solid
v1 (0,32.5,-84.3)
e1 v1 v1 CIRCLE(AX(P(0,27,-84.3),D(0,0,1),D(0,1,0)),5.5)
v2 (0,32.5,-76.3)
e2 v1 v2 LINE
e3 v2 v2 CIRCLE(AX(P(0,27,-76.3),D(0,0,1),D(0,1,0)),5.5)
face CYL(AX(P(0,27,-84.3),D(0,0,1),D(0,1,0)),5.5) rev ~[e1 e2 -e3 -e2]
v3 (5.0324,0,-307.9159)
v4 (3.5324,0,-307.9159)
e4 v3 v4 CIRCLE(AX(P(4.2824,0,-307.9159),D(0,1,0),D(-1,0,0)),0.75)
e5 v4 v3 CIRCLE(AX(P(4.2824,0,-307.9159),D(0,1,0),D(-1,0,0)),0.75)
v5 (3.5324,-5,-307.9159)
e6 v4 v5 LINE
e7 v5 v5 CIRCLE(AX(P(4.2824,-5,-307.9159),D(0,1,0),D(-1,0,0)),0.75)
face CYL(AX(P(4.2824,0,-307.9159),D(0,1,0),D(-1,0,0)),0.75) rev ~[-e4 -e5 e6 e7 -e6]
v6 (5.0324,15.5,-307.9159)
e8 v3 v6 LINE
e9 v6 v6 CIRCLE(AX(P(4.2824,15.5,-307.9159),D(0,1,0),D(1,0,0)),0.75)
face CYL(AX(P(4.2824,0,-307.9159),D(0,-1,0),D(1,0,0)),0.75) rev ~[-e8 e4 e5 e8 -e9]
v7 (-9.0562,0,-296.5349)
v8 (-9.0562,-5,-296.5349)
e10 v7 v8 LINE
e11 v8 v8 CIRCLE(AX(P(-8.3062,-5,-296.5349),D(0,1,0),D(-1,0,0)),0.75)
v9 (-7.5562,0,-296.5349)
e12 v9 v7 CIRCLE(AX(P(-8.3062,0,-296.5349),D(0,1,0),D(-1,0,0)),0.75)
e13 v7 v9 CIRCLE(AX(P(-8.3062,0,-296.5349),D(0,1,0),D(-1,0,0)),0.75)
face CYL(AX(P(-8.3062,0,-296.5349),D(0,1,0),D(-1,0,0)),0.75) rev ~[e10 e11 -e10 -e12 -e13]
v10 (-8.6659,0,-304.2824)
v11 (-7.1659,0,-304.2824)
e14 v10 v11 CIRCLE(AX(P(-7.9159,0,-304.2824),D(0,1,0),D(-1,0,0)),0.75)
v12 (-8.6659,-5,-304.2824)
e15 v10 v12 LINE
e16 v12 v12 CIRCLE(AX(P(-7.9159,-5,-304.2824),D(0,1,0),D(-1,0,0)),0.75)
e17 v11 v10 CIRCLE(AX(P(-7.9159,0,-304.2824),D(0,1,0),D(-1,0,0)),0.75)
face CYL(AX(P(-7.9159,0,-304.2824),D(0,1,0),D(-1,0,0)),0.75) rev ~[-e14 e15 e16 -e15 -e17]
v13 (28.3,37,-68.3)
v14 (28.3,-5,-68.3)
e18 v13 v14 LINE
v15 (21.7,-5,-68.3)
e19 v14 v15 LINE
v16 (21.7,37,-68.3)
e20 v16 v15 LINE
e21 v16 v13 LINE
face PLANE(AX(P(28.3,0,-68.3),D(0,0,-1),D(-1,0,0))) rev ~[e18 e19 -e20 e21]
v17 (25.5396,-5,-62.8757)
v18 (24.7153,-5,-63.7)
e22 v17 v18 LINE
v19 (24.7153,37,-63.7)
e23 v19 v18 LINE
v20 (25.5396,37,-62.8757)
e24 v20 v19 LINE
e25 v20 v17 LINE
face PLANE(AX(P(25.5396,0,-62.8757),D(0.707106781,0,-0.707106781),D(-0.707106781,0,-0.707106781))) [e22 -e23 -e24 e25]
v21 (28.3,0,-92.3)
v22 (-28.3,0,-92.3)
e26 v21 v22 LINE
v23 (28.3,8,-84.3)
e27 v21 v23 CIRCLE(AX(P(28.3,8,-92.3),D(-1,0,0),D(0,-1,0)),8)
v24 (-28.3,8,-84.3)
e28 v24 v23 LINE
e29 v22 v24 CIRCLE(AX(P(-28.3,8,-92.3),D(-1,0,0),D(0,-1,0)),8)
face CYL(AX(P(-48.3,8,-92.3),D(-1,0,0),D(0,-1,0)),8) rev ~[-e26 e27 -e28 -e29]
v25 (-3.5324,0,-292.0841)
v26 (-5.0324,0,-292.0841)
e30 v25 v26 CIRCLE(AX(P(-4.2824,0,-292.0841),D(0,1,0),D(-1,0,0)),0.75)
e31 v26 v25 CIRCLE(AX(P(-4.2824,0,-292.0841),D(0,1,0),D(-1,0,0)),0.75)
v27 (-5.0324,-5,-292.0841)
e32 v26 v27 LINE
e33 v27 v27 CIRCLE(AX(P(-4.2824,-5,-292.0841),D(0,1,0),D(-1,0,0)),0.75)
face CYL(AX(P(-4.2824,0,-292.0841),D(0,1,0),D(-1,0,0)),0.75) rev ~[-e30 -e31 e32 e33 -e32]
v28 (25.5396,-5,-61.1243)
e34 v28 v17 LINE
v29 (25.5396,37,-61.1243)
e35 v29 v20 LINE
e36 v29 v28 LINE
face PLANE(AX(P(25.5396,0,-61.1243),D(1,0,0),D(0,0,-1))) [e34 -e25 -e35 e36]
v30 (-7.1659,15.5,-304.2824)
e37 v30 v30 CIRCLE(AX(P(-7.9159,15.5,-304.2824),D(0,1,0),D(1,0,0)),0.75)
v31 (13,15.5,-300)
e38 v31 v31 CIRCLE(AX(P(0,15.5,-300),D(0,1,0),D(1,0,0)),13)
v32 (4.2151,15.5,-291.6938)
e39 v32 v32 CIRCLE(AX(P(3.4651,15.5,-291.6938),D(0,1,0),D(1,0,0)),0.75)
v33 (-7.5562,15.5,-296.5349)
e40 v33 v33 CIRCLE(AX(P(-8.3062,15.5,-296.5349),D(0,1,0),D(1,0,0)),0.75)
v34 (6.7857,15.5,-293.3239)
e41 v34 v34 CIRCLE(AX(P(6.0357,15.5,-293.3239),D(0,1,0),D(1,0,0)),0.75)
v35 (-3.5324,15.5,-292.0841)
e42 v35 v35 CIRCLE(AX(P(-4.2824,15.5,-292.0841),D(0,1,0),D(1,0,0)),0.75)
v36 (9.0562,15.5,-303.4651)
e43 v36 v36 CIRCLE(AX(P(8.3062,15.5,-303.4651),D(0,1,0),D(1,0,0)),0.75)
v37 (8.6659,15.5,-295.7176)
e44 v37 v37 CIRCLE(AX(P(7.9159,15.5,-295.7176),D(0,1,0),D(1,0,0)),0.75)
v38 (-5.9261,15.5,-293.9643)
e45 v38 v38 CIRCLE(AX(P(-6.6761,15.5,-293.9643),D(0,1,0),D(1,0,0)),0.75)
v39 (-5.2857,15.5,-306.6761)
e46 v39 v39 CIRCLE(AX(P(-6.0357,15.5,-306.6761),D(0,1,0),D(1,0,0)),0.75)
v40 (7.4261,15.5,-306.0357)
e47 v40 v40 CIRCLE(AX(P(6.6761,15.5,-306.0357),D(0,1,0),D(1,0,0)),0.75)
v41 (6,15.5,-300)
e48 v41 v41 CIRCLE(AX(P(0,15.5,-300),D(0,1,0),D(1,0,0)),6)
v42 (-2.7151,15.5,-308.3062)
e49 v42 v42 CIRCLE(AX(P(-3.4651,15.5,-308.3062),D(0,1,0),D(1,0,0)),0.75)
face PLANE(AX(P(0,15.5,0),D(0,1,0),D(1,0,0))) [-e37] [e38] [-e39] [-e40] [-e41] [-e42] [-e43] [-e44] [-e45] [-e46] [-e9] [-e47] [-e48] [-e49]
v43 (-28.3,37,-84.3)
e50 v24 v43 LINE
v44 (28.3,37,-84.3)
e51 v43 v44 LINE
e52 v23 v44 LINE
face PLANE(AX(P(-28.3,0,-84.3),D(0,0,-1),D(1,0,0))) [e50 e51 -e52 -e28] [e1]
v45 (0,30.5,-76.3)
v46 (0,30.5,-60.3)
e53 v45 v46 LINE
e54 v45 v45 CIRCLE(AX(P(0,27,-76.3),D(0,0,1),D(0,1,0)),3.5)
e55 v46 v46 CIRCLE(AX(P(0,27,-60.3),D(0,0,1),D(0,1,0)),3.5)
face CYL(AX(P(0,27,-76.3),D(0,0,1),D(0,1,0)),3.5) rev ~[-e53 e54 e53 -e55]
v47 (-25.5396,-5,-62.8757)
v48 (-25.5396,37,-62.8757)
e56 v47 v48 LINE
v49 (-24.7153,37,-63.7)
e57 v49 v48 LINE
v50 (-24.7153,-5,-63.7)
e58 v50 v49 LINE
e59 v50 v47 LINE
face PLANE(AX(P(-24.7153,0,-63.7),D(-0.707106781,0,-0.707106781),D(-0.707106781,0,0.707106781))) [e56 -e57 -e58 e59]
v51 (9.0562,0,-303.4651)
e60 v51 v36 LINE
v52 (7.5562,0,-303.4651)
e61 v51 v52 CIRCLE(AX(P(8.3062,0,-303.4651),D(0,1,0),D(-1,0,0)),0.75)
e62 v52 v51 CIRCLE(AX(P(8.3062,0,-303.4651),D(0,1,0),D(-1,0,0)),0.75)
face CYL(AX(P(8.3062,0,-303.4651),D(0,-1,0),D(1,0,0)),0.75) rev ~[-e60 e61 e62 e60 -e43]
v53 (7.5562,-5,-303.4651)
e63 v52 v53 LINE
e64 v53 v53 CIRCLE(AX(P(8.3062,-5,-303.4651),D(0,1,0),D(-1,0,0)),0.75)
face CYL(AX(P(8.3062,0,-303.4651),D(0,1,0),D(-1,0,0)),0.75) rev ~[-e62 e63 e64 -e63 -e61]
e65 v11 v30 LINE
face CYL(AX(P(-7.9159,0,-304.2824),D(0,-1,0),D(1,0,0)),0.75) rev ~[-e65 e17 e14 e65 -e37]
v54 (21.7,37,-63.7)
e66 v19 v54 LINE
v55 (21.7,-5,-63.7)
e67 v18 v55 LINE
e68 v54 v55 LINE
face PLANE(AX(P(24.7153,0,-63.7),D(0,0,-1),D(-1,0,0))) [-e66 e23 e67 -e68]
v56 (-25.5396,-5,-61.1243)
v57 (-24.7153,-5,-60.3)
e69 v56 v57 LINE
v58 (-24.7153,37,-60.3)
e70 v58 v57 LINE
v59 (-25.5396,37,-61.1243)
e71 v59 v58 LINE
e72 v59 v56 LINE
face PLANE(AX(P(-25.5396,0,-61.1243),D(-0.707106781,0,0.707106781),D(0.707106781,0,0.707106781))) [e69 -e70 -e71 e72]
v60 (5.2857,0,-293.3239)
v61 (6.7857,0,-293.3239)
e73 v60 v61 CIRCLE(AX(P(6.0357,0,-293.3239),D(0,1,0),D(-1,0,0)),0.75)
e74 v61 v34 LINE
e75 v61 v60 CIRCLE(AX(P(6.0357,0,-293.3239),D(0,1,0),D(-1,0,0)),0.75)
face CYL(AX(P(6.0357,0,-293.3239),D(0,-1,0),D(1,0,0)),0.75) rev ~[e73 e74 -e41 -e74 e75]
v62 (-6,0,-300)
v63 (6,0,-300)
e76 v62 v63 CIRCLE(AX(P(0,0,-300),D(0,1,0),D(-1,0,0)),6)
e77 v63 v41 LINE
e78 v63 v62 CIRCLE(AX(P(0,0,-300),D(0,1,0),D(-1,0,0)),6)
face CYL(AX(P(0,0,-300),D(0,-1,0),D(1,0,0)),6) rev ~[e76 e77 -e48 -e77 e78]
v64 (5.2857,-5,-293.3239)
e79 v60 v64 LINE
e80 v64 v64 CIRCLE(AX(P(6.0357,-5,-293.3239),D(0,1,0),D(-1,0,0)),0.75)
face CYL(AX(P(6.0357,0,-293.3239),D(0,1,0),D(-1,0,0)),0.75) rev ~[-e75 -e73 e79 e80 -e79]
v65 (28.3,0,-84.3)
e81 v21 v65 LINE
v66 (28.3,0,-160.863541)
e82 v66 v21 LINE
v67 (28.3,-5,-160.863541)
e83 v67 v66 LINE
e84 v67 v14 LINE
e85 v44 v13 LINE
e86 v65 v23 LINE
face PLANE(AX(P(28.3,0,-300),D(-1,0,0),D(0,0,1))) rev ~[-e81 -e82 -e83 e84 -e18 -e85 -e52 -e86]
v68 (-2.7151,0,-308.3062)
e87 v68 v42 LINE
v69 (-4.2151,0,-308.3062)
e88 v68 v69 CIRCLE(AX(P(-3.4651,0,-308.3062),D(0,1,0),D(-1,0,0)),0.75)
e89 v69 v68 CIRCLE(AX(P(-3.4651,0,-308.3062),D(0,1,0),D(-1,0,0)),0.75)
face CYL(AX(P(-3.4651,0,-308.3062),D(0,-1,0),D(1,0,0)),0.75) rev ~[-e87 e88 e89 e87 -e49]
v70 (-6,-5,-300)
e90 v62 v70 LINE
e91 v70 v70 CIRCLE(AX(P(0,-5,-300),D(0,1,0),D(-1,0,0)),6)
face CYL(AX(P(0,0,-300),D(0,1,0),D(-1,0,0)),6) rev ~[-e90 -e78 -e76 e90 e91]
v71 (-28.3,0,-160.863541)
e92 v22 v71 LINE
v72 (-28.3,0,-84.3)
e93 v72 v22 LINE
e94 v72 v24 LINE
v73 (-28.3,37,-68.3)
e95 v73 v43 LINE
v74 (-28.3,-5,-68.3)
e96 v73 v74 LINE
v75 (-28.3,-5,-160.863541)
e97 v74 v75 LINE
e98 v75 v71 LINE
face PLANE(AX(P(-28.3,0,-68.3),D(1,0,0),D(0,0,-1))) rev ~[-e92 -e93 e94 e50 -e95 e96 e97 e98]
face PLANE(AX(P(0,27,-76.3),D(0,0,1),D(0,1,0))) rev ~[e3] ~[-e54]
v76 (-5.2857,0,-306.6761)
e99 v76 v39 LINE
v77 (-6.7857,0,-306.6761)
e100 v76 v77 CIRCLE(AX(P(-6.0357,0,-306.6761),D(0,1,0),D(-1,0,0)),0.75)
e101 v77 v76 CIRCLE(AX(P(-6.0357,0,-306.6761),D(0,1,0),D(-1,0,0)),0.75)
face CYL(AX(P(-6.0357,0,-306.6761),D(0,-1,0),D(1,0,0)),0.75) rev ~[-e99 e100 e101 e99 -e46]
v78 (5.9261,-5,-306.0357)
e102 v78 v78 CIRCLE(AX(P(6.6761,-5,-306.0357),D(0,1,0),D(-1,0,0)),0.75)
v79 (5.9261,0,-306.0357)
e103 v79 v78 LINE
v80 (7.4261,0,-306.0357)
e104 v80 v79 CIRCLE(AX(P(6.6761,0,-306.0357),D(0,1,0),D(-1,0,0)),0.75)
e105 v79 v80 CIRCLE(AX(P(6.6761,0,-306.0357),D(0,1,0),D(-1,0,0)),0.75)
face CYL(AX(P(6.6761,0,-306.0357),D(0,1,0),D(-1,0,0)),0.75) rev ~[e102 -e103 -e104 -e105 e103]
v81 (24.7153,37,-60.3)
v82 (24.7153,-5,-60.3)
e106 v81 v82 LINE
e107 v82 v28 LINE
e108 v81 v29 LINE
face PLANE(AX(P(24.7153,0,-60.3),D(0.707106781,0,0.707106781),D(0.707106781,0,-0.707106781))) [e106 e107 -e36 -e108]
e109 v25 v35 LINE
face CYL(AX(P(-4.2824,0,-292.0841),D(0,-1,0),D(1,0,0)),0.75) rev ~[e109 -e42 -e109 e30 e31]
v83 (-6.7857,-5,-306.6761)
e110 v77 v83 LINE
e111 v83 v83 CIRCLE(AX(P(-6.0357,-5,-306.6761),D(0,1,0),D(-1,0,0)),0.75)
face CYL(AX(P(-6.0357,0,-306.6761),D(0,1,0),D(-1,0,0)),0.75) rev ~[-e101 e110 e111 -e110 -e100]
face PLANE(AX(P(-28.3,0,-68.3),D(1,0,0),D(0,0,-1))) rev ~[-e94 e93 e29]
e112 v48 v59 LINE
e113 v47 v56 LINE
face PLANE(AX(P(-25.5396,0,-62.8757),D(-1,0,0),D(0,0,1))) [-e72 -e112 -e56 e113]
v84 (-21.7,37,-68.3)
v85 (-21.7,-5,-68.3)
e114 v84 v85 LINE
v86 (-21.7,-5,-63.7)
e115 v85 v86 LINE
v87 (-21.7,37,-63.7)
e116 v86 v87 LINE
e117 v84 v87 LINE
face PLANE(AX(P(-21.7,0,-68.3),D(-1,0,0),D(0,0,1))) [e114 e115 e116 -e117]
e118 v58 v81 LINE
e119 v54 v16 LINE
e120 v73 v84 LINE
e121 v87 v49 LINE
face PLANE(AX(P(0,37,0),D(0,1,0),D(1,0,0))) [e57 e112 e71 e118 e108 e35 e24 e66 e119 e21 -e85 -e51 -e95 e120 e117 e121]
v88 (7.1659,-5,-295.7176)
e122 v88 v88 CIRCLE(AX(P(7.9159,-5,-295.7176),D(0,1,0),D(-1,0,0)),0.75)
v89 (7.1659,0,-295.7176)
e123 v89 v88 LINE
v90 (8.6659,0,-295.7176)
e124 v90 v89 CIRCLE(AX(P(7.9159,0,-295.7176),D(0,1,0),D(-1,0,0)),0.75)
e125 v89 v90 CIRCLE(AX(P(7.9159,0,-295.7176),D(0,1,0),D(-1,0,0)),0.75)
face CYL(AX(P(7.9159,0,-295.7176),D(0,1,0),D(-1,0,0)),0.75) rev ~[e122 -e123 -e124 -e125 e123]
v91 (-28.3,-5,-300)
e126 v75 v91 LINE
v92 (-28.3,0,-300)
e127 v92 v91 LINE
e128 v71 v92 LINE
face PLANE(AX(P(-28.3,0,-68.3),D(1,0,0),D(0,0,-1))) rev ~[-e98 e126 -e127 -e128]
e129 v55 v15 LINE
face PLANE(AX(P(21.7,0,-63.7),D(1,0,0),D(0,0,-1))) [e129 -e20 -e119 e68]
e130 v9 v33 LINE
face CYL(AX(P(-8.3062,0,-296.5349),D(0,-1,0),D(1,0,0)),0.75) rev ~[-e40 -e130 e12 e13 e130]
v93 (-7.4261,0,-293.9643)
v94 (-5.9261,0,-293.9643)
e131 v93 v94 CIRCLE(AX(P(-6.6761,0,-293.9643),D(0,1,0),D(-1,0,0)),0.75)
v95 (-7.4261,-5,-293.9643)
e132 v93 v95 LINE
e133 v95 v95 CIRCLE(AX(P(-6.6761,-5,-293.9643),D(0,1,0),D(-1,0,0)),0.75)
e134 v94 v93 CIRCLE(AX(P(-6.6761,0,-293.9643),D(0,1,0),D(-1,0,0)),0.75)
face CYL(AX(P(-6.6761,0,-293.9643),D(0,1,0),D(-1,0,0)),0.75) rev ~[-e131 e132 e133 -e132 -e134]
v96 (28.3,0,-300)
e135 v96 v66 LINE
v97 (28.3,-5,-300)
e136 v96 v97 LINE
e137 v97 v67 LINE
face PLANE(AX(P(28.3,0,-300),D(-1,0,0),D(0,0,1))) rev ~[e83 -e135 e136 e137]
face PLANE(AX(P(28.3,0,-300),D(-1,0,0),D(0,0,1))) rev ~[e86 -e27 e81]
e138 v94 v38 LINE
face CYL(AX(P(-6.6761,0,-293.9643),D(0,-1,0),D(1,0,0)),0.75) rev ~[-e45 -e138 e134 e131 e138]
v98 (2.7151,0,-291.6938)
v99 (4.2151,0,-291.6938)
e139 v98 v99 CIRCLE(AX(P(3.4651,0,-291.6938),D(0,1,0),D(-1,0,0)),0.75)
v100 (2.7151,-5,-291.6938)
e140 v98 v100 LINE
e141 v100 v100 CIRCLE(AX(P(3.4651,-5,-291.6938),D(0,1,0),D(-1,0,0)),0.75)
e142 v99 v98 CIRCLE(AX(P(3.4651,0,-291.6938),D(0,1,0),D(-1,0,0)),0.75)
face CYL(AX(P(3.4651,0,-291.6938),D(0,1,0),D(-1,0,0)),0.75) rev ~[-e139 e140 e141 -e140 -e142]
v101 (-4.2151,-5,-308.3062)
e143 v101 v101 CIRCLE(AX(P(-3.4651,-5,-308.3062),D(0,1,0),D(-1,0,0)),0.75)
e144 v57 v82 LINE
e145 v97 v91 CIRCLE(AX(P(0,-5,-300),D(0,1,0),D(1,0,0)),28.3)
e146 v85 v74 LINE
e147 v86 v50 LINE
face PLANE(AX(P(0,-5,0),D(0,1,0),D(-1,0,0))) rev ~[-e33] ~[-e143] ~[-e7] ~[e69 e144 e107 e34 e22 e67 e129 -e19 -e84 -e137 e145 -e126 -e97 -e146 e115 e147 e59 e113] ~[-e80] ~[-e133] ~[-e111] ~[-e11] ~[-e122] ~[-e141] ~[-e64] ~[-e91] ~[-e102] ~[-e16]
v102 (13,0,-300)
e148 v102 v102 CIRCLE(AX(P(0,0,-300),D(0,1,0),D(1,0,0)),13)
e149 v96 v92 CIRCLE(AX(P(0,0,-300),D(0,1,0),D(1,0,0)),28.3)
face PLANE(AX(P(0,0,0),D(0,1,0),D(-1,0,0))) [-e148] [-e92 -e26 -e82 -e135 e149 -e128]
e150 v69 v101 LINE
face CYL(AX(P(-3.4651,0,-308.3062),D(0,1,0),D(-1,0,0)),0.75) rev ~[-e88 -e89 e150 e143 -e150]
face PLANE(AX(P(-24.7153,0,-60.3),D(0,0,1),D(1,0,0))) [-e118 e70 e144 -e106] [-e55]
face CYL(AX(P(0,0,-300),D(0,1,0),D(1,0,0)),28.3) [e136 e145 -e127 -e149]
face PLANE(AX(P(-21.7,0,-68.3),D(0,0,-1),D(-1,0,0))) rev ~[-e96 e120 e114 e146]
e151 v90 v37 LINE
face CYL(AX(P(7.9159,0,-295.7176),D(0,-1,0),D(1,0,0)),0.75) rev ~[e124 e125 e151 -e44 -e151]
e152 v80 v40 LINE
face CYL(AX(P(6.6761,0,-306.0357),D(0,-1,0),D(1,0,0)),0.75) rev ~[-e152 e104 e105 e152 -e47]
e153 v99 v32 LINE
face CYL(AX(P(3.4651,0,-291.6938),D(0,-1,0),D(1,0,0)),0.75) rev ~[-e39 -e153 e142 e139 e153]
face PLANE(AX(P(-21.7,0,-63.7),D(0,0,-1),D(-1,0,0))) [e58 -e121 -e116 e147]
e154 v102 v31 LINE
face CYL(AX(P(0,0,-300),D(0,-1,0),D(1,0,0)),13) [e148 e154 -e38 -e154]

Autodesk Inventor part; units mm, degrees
ref_plane "YZ Plane" through (0, 0, 0) normal (1, 0, 0) x (0, 1, 0)
ref_plane "XZ Plane" through (0, 0, 0) normal (0, 1, 0) x (-1, 0, 0)
ref_plane "XY Plane" through (0, 0, 0) normal (0, 0, 1) x (1, 0, 0)
sketch "Sketch1" plane through (0, 0, 0) normal (0, 1, 0) x (-1, 0, 0)
  circle A0 centre (14, -52) radius 5.5 construction
  circle A1 centre (-14, -52) radius 5.5 construction
  circle A2 centre (-4.2824, 7.9159) radius 0.75 construction
  circle A3 centre (3.4651, 8.3062) radius 0.75 construction
  circle A4 centre (6.0357, 6.6761) radius 0.75 construction
  circle A5 centre (7.9159, 4.2824) radius 0.75 construction
  circle A6 centre (8.3062, -3.4651) radius 0.75 construction
  circle A7 centre (6.6761, -6.0357) radius 0.75 construction
  circle A8 centre (4.2824, -7.9159) radius 0.75 construction
  circle A9 centre (-3.4651, -8.3062) radius 0.75 construction
  circle A10 centre (-6.0357, -6.6761) radius 0.75 construction
  circle A11 centre (-7.9159, -4.2824) radius 0.75 construction
  circle A12 centre (-6.6761, 6.0357) radius 0.75 construction
  circle A13 centre (-8.3062, 3.4651) radius 0.75 construction
  circle A14 centre (0, 0) radius 6 construction
  line L0 (28, -68) -> (28, 0) construction
  arc A15 (28, 0) -> (-28, 0) centre (0, 0) ccw construction
  line L1 (-28, 0) -> (-28, -68) construction
  line L2 (-28, -68) -> (-22, -68) construction
  line L3 (-22, -68) -> (-22, -64) construction
  line L4 (-22, -64) -> (-24.8396, -64) construction
  line L5 (-24.8396, -64) -> (-25.8396, -63) construction
  line L6 (-25.8396, -63) -> (-25.8396, -61) construction
  line L7 (-25.8396, -61) -> (-24.8396, -60) construction
  line L8 (-24.8396, -60) -> (24.8396, -60) construction
  line L9 (24.8396, -60) -> (25.8396, -61) construction
  line L10 (25.8396, -61) -> (25.8396, -63) construction
  line L11 (25.8396, -63) -> (24.8396, -64) construction
  line L12 (24.8396, -64) -> (22, -64) construction
  line L13 (22, -64) -> (22, -68) construction
  line L14 (22, -68) -> (28, -68) construction
  line L15 (0, 0) -> (0, -300) construction
  line L16 (-28.3, 0) -> (-28.3, -300) construction
  line L17 (28.3, -300) -> (28.3, 0) construction
  arc A16 (28.3, 0) -> (-28.3, 0) centre (0, 0) ccw construction
  arc A17 (-28.3, -300) -> (28.3, -300) centre (0, -300) ccw construction
  line L18 (21.7, -63.7) -> (24.7153, -63.7)
  line L19 (24.7153, -63.7) -> (25.5396, -62.8757)
  line L20 (25.5396, -62.8757) -> (25.5396, -61.1243)
  line L21 (25.5396, -61.1243) -> (24.7153, -60.3)
  line L22 (24.7153, -60.3) -> (-24.7153, -60.3)
  line L23 (-24.7153, -60.3) -> (-25.5396, -61.1243)
  line L24 (-25.5396, -61.1243) -> (-25.5396, -62.8757)
  line L25 (-25.5396, -62.8757) -> (-24.7153, -63.7)
  line L26 (-24.7153, -63.7) -> (-21.7, -63.7)
  line L27 (-21.7, -63.7) -> (-21.7, -68.3)
  line L28 (-21.7, -68.3) -> (-28.3, -68.3) construction
  line L29 (-28.3, -68.3) -> (-28.3, 0) construction
  arc A18 (28.3, 0) -> (-28.3, 0) centre (0, 0) ccw construction
  line L30 (28.3, 0) -> (28.3, -68.3) construction
  line L31 (28.3, -68.3) -> (21.7, -68.3) construction
  line L32 (21.7, -68.3) -> (21.7, -63.7)
  arc A19 (-28.3, -300) -> (28.3, -300) centre (0, -300) ccw
  line L33 (0, -150) -> (28.3, -150) construction
  circle A20 centre (-4.2824, -307.9159) radius 0.75
  circle A21 centre (3.4651, -308.3062) radius 0.75
  circle A22 centre (6.0357, -306.6761) radius 0.75
  circle A23 centre (7.9159, -304.2824) radius 0.75
  circle A24 centre (8.3062, -296.5349) radius 0.75
  circle A25 centre (6.6761, -293.9643) radius 0.75
  circle A26 centre (4.2824, -292.0841) radius 0.75
  circle A27 centre (-3.4651, -291.6938) radius 0.75
  circle A28 centre (-6.0357, -293.3239) radius 0.75
  circle A29 centre (-7.9159, -295.7176) radius 0.75
  circle A30 centre (-6.6761, -306.0357) radius 0.75
  circle A31 centre (-8.3062, -303.4651) radius 0.75
  circle A32 centre (0, -300) radius 6
  line L34 (-28.3, -300) -> (-28.3, -68.3)
  line L35 (-28.3, -68.3) -> (-21.7, -68.3)
  line L36 (21.7, -68.3) -> (28.3, -68.3)
  line L37 (28.3, -68.3) -> (28.3, -300)
  point P0 (0, -150)
  dimension "d1" = 0.3
extrude "Extrusion1" add sketch "Sketch1" against normal blind 5
sketch "Sketch2" plane through (0, 0, 0) normal (0, 1, 0) x (1, 0, 0)
  circle A0 centre (0, 300) radius 6 construction
  circle A1 centre (8.3062, 303.4651) radius 0.75 construction
  circle A2 centre (6.6761, 306.0357) radius 0.75 construction
  circle A3 centre (-7.9159, 304.2824) radius 0.75 construction
  circle A4 centre (-6.0357, 306.6761) radius 0.75 construction
  circle A5 centre (-3.4651, 308.3062) radius 0.75 construction
  circle A6 centre (4.2824, 307.9159) radius 0.75 construction
  circle A7 centre (3.4651, 291.6938) radius 0.75 construction
  circle A8 centre (6.0357, 293.3239) radius 0.75 construction
  circle A9 centre (7.9159, 295.7176) radius 0.75 construction
  circle A10 centre (-8.3062, 296.5349) radius 0.75 construction
  circle A11 centre (-6.6761, 293.9643) radius 0.75 construction
  circle A12 centre (-4.2824, 292.0841) radius 0.75 construction
  arc A13 (28.3, 300) -> (-28.3, 300) centre (0, 300) ccw construction
  line L0 (-28.3, 300) -> (-28.3, 68.3) construction
  line L1 (-28.3, 68.3) -> (-21.7, 68.3) projected
  line L2 (-21.7, 68.3) -> (-21.7, 63.7) projected
  line L3 (-21.7, 63.7) -> (-24.7153, 63.7) projected
  line L4 (-24.7153, 63.7) -> (-25.5396, 62.8757) projected
  line L5 (-25.5396, 62.8757) -> (-25.5396, 61.1243) projected
  line L6 (-25.5396, 61.1243) -> (-24.7153, 60.3) projected
  line L7 (-24.7153, 60.3) -> (24.7153, 60.3) projected
  line L8 (24.7153, 60.3) -> (25.5396, 61.1243) projected
  line L9 (25.5396, 61.1243) -> (25.5396, 62.8757) projected
  line L10 (25.5396, 62.8757) -> (24.7153, 63.7) projected
  line L11 (24.7153, 63.7) -> (21.7, 63.7) projected
  line L12 (21.7, 63.7) -> (21.7, 68.3) projected
  line L13 (21.7, 68.3) -> (28.3, 68.3) projected
  line L14 (28.3, 68.3) -> (28.3, 300) construction
  line L15 (-28.3, 68.3) -> (-28.3, 300) construction
  line L16 (-28.3, 68.3) -> (-28.3, 84.3)
  line L17 (-28.3, 84.3) -> (28.3, 84.3)
  line L18 (28.3, 68.3) -> (28.3, 300) construction
  line L19 (28.3, 84.3) -> (28.3, 68.3)
  point P0 (0, 0)
  dimension "d5" = 16
extrude "Extrusion2" add sketch "Sketch2" along normal blind 37
sketch "Sketch3" plane through (0, 0, 0) normal (0, 1, 0) x (1, 0, 0)
  point P0 (0, 0)
sketch "Sketch4" plane through (0, 0, 0) normal (0, 1, 0) x (1, 0, 0)
  line L0 (-28.3, 84.3) -> (28.3, 84.3) projected
  line L1 (28.3, 84.3) -> (28.3, 300) projected
  arc A0 (28.3, 300) -> (-28.3, 300) centre (0, 300) ccw projected
  line L2 (-28.3, 300) -> (-28.3, 84.3) projected
  circle A1 centre (0, 300) radius 6 projected
  circle A2 centre (8.3062, 303.4651) radius 0.75 projected
  circle A3 centre (6.6761, 306.0357) radius 0.75 projected
  circle A4 centre (-7.9159, 304.2824) radius 0.75 projected
  circle A5 centre (-6.0357, 306.6761) radius 0.75 projected
  circle A6 centre (-3.4651, 308.3062) radius 0.75 projected
  circle A7 centre (4.2824, 307.9159) radius 0.75 projected
  circle A8 centre (3.4651, 291.6938) radius 0.75 projected
  circle A9 centre (6.0357, 293.3239) radius 0.75 projected
  circle A10 centre (7.9159, 295.7176) radius 0.75 projected
  circle A11 centre (-8.3062, 296.5349) radius 0.75 projected
  circle A12 centre (-6.6761, 293.9643) radius 0.75 projected
  circle A13 centre (-4.2824, 292.0841) radius 0.75 projected
  circle A14 centre (0, 300) radius 13
  point P0 (0, 0)
  dimension "d8" = 26
extrude "Extrusion3" add sketch "Sketch4" along normal blind 15.5 contours A14
sketch "Sketch5" plane through (28.3, 0, -84.3) normal (0, 0, -1) x (-1, 0, 0)
  line L0 (56.6, 0) -> (0, 0) construction
  line L1 (56.6, 0) -> (56.6, 37) construction
  line L2 (0, 37) -> (56.6, 37) construction
  line L3 (0, 0) -> (0, 37) construction
  line L4 (0, 37) -> (56.6, 37) construction
  line L5 (28.3, 37) -> (28.3, 0) construction
  point P0 (28.3, 27)
  dimension "d11" = 10
hole "Hole1" at (0, 27, -84.3) direction (0, 0, 1) diameter 7 end through all counterbore diameter 11 counterbore depth 8
fillet "Fillet1" radius 8 1 edges at (0, 0, -84.3)
properties part number "arm_segment_1_2a"
